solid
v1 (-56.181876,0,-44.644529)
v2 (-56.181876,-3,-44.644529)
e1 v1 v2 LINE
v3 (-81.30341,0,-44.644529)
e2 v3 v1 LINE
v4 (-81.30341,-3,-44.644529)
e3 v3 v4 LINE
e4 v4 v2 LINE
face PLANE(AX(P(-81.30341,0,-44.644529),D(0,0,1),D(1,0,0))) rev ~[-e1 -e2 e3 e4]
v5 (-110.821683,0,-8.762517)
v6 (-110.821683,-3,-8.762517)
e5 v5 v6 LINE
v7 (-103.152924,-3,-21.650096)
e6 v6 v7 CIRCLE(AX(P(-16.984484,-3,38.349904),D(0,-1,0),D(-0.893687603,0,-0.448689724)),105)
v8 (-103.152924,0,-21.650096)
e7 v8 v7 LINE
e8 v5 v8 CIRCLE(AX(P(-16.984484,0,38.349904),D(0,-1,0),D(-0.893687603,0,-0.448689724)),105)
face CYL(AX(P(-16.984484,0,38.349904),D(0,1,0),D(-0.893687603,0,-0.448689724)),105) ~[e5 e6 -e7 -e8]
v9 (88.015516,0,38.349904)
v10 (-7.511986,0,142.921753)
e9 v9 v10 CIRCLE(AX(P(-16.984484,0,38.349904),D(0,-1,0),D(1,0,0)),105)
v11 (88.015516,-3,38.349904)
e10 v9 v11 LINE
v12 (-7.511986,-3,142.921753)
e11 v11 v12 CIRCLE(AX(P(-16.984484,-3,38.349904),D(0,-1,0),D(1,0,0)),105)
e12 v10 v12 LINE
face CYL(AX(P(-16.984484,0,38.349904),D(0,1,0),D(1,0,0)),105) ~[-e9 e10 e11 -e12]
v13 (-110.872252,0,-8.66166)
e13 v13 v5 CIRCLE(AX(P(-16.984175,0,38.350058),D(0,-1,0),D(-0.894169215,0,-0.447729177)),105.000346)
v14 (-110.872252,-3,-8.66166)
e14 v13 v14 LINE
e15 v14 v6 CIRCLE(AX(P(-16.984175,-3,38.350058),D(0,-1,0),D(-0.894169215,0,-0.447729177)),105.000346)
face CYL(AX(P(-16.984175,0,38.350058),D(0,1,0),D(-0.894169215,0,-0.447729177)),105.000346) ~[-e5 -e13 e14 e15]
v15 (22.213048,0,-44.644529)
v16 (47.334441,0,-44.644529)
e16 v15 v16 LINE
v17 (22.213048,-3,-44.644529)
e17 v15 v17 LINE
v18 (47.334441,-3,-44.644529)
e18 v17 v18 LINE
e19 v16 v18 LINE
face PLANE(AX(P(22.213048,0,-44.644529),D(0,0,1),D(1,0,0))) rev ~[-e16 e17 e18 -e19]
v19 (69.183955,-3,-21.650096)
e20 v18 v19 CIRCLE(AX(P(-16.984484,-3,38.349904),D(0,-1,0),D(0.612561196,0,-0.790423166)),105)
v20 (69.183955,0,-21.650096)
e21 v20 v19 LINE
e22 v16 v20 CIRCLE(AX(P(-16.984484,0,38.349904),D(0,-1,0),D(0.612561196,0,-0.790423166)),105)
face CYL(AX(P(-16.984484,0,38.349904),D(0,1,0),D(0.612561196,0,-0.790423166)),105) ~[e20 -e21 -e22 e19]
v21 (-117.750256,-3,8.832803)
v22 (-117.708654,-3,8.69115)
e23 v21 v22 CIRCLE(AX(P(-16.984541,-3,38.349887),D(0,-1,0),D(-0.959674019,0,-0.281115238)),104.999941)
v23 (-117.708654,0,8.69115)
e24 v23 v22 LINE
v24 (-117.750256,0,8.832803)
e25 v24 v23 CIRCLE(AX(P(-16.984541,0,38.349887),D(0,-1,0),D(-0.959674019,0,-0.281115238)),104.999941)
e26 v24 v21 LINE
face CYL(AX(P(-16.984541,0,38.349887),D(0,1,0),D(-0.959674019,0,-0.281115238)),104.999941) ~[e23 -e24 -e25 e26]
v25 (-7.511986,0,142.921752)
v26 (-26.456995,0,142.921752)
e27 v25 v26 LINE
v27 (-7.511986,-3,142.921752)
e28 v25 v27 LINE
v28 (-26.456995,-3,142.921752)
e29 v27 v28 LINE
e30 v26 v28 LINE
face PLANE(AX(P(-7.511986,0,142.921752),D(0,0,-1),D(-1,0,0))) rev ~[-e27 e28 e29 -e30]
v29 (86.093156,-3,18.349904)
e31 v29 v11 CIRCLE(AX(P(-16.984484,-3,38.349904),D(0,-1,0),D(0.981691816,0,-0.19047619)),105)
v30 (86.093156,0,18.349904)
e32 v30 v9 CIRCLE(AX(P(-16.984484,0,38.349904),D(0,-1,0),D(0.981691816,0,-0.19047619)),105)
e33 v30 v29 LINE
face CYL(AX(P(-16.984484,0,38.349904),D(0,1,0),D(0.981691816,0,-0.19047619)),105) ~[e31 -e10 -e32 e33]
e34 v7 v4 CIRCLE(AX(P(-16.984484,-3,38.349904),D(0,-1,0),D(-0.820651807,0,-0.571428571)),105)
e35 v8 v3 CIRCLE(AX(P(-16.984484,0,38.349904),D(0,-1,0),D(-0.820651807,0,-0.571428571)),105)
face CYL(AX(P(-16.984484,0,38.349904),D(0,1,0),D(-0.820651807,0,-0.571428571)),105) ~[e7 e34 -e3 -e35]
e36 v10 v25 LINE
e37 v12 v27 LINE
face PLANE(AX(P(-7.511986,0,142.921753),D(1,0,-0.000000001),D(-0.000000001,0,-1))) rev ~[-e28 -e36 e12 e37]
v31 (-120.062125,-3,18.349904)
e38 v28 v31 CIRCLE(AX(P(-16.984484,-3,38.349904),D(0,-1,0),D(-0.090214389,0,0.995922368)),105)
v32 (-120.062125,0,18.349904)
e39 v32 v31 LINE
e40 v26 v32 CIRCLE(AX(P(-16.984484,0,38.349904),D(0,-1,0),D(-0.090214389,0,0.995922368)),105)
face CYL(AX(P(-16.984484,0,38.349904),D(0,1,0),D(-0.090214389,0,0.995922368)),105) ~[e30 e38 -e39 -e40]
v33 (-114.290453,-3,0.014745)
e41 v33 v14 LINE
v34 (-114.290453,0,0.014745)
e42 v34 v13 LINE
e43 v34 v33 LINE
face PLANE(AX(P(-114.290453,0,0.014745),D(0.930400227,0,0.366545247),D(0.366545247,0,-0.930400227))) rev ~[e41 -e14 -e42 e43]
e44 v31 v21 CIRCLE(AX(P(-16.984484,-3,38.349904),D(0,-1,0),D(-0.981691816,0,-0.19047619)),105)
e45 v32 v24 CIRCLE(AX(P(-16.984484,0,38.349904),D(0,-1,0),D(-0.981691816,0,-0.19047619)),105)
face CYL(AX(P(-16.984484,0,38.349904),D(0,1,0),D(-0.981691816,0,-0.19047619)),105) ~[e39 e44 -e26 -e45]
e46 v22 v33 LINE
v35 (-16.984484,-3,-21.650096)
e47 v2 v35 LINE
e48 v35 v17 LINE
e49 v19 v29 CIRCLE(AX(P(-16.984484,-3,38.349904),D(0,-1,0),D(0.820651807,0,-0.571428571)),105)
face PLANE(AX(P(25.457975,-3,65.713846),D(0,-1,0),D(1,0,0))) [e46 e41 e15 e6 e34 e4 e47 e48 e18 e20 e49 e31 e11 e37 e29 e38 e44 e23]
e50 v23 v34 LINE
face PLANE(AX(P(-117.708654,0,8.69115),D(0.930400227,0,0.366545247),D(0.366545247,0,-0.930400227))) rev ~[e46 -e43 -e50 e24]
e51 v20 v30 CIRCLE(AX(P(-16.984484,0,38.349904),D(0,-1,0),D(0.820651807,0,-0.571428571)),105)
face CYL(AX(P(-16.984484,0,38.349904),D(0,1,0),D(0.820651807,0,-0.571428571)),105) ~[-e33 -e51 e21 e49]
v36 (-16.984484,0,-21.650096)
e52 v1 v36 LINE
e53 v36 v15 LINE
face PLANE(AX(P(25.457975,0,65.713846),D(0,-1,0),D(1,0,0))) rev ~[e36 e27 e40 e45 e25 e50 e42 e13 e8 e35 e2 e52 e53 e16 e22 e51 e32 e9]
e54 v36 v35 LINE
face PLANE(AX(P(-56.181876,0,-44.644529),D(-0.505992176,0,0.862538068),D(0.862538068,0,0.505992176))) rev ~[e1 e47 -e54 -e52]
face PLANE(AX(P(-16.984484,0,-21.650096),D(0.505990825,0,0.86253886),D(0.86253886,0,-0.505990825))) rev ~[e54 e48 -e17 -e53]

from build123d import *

# Parameters (mm, degrees)
F0_W     = 40
F0_H     = 40
F0_W_2   = 9.4724982
F0_H_2   = 96
F0_W_3   = 9.4725108908
F1_DEPTH = 3


# Not quite as in the source:
# - ends of sketch curves that miss each other by under 0.0002 mm in the source are joined


with BuildPart() as f1:
    # F0 (on Front) → F1 (new body)
    with BuildSketch(Plane.XZ):
        with BuildLine():
            ThreePointArc((86.0931563339, 18.3499035886), (87.5338209496, 28.3038164709), (88.0155156934, 38.3499035886))
            ThreePointArc((88.0155156934, 38.3499035886), (60.5384552721, 109.1679368787), (-7.5119860033, 142.9217534139))
            Line((-7.5119860033, 142.9217534139), (-7.5119861066, 46.9217522737))
            Line((-7.5119861066, 46.9217522737), (-16.9844843066, 46.9217522737))
            Line((-16.9844843066, 46.9217522737), (-16.9844843066, 38.3499035886))
            Line((-16.9844843066, 38.3499035886), (-16.9844843066, 18.3499035886))
            Line((-16.9844843066, 18.3499035886), (7.9387861441, 18.3499035886))
            Line((7.9387861441, 18.3499035886), (-12.4932068051, 26.3993963716))
            Line((-12.4932068051, 26.3993963716), (-8.6108822672, 35.0509963625))
            Line((-8.6108822672, 35.0509963625), (-5.9856059721, 42.9176116083))
            Line((-5.9856059721, 42.9176116083), (56.3745017477, 18.3499035886))
            Line((56.3745017477, 18.3499035886), (86.0931563339, 18.3499035886))
        make_face()
        with Locations((38.3114193761, 61.7765981326)):
            Rectangle(F0_W, F0_H, mode=Mode.SUBTRACT)
        with Locations((-12.2482352066, 94.9217522737)):
            Rectangle(F0_W_2, F0_H_2)
        with BuildLine():
            ThreePointArc((69.1839553915, -21.6500964114), (79.7291121051, -2.533837301), (86.0931563339, 18.3499035886))
            Line((86.0931563339, 18.3499035886), (56.3745017477, 18.3499035886))
            Line((56.3745017477, 18.3499035886), (83.3328157811, 7.7292678634))
            Line((83.3328157811, 7.7292678634), (80.2973141438, 0.0242670983))
            Line((80.2973141438, 0.0242670983), (76.8252149481, -8.7889473734))
            Line((76.8252149481, -8.7889473734), (7.9387861441, 18.3499035886))
            Line((7.9387861441, 18.3499035886), (-16.9844843066, 18.3499035886))
            Line((-16.9844843066, 18.3499035886), (69.1839553915, -21.6500964114))
        make_face()
        with Locations((-21.720739752, 94.9217522737)):
            Rectangle(F0_W_3, F0_H_2)
        with BuildLine():
            ThreePointArc((47.3344412398, -44.6445288546), (59.1325161296, -33.9771469845), (69.1839553915, -21.6500964114))
            Line((69.1839553915, -21.6500964114), (-16.9844843066, 18.3499035886))
            Line((-16.9844843066, 18.3499035886), (-103.1529240046, -21.6500964114))
            ThreePointArc((-103.1529240046, -21.6500964114), (-93.1014847427, -33.9771469845), (-81.3034098529, -44.6445288546))
            Line((-81.3034098529, -44.6445288546), (-56.1818756669, -44.6445288546))
            Line((-56.1818756669, -44.6445288546), (-16.9844843066, -21.6500964114))
            Line((-16.9844843066, -21.6500964114), (22.2130476509, -44.6445288546))
            Line((22.2130476509, -44.6445288546), (47.3344412398, -44.6445288546))
        make_face()
        Polygon((83.3328157811, 7.7292678634), (56.3745017477, 18.3499035886), (7.9387861441, 18.3499035886), (76.8252149481, -8.7889473734), (80.2973141438, 0.0242670983), align=None)
        Polygon((7.9387861441, 18.3499035886), (56.3745017477, 18.3499035886), (-5.9856059721, 42.9176116083), (-8.6108822672, 35.0509963625), (-12.4932068051, 26.3993963716), align=None)
        with BuildLine():
            Line((-26.4569951974, 46.9217522737), (-26.4569951974, 142.9217522737))
            ThreePointArc((-26.4569951974, 142.9217522737), (-100.9274442474, 101.4258853595), (-120.062124947, 18.3499035886))
            Line((-120.062124947, 18.3499035886), (-93.5930420098, 18.3499035886))
            Line((-93.5930420098, 18.3499035886), (-28.4441302912, 44.0163031416))
            Line((-28.4441302912, 44.0163031416), (-25.3580863459, 35.0509963625))
            Line((-25.3580863459, 35.0509963625), (-21.5126400611, 26.4221312691))
            Line((-21.5126400611, 26.4221312691), (-42.002340903, 18.3499035886))
            Line((-42.002340903, 18.3499035886), (-16.9844843066, 18.3499035886))
            Line((-16.9844843066, 18.3499035886), (-16.9844843066, 38.3499035886))
            Line((-16.9844843066, 38.3499035886), (-16.9844843066, 46.9217522737))
            Line((-16.9844843066, 46.9217522737), (-26.4569951974, 46.9217522737))
        make_face()
        with Locations((-72.2803842399, 61.7765981326)):
            Rectangle(F0_W, F0_H, mode=Mode.SUBTRACT)
        with BuildLine():
            Line((-103.1529240046, -21.6500964114), (-16.9844843066, 18.3499035886))
            Line((-16.9844843066, 18.3499035886), (-42.002340903, 18.3499035886))
            Line((-42.002340903, 18.3499035886), (-110.8216826256, -8.7625174025))
            ThreePointArc((-110.8216826256, -8.7625174025), (-107.2176813721, -15.3433934543), (-103.1529240046, -21.6500964114))
        make_face()
        with BuildLine():
            Line((-93.5930420098, 18.3499035886), (-120.062124947, 18.3499035886))
            ThreePointArc((-120.062124947, 18.3499035886), (-119.0172144252, 13.5643839342), (-117.750256284, 8.8328034975))
            Line((-117.750256284, 8.8328034975), (-93.5930420098, 18.3499035886))
        make_face()
        with BuildLine():
            Line((-110.8216826256, -8.7625174025), (-42.002340903, 18.3499035886))
            Line((-42.002340903, 18.3499035886), (-93.5930420098, 18.3499035886))
            Line((-93.5930420098, 18.3499035886), (-117.750256284, 8.8328034975))
            ThreePointArc((-117.750256284, 8.8328034975), (-117.7294799239, 8.7619692561), (-117.7086537702, 8.6911496387))
            Line((-117.7086537702, 8.6911496387), (-114.2904528488, 0.0147449249))
            Line((-114.2904528488, 0.0147449249), (-110.8722519274, -8.6616597888))
            ThreePointArc((-110.8722519274, -8.6616597888), (-110.8469808232, -8.7120953879), (-110.8216826256, -8.7625174025))
        make_face()
        Polygon((-93.5930420098, 18.3499035886), (-42.002340903, 18.3499035886), (-21.5126400611, 26.4221312691), (-25.3580863459, 35.0509963625), (-28.4441302912, 44.0163031416), align=None)
        with Locations((38.3114193761, 61.7765981326)):
            Rectangle(F0_W, F0_H)
        with Locations((-72.2803842399, 61.7765981326)):
            Rectangle(F0_W, F0_H)
    extrude(amount=F1_DEPTH)


solid = f1.part
